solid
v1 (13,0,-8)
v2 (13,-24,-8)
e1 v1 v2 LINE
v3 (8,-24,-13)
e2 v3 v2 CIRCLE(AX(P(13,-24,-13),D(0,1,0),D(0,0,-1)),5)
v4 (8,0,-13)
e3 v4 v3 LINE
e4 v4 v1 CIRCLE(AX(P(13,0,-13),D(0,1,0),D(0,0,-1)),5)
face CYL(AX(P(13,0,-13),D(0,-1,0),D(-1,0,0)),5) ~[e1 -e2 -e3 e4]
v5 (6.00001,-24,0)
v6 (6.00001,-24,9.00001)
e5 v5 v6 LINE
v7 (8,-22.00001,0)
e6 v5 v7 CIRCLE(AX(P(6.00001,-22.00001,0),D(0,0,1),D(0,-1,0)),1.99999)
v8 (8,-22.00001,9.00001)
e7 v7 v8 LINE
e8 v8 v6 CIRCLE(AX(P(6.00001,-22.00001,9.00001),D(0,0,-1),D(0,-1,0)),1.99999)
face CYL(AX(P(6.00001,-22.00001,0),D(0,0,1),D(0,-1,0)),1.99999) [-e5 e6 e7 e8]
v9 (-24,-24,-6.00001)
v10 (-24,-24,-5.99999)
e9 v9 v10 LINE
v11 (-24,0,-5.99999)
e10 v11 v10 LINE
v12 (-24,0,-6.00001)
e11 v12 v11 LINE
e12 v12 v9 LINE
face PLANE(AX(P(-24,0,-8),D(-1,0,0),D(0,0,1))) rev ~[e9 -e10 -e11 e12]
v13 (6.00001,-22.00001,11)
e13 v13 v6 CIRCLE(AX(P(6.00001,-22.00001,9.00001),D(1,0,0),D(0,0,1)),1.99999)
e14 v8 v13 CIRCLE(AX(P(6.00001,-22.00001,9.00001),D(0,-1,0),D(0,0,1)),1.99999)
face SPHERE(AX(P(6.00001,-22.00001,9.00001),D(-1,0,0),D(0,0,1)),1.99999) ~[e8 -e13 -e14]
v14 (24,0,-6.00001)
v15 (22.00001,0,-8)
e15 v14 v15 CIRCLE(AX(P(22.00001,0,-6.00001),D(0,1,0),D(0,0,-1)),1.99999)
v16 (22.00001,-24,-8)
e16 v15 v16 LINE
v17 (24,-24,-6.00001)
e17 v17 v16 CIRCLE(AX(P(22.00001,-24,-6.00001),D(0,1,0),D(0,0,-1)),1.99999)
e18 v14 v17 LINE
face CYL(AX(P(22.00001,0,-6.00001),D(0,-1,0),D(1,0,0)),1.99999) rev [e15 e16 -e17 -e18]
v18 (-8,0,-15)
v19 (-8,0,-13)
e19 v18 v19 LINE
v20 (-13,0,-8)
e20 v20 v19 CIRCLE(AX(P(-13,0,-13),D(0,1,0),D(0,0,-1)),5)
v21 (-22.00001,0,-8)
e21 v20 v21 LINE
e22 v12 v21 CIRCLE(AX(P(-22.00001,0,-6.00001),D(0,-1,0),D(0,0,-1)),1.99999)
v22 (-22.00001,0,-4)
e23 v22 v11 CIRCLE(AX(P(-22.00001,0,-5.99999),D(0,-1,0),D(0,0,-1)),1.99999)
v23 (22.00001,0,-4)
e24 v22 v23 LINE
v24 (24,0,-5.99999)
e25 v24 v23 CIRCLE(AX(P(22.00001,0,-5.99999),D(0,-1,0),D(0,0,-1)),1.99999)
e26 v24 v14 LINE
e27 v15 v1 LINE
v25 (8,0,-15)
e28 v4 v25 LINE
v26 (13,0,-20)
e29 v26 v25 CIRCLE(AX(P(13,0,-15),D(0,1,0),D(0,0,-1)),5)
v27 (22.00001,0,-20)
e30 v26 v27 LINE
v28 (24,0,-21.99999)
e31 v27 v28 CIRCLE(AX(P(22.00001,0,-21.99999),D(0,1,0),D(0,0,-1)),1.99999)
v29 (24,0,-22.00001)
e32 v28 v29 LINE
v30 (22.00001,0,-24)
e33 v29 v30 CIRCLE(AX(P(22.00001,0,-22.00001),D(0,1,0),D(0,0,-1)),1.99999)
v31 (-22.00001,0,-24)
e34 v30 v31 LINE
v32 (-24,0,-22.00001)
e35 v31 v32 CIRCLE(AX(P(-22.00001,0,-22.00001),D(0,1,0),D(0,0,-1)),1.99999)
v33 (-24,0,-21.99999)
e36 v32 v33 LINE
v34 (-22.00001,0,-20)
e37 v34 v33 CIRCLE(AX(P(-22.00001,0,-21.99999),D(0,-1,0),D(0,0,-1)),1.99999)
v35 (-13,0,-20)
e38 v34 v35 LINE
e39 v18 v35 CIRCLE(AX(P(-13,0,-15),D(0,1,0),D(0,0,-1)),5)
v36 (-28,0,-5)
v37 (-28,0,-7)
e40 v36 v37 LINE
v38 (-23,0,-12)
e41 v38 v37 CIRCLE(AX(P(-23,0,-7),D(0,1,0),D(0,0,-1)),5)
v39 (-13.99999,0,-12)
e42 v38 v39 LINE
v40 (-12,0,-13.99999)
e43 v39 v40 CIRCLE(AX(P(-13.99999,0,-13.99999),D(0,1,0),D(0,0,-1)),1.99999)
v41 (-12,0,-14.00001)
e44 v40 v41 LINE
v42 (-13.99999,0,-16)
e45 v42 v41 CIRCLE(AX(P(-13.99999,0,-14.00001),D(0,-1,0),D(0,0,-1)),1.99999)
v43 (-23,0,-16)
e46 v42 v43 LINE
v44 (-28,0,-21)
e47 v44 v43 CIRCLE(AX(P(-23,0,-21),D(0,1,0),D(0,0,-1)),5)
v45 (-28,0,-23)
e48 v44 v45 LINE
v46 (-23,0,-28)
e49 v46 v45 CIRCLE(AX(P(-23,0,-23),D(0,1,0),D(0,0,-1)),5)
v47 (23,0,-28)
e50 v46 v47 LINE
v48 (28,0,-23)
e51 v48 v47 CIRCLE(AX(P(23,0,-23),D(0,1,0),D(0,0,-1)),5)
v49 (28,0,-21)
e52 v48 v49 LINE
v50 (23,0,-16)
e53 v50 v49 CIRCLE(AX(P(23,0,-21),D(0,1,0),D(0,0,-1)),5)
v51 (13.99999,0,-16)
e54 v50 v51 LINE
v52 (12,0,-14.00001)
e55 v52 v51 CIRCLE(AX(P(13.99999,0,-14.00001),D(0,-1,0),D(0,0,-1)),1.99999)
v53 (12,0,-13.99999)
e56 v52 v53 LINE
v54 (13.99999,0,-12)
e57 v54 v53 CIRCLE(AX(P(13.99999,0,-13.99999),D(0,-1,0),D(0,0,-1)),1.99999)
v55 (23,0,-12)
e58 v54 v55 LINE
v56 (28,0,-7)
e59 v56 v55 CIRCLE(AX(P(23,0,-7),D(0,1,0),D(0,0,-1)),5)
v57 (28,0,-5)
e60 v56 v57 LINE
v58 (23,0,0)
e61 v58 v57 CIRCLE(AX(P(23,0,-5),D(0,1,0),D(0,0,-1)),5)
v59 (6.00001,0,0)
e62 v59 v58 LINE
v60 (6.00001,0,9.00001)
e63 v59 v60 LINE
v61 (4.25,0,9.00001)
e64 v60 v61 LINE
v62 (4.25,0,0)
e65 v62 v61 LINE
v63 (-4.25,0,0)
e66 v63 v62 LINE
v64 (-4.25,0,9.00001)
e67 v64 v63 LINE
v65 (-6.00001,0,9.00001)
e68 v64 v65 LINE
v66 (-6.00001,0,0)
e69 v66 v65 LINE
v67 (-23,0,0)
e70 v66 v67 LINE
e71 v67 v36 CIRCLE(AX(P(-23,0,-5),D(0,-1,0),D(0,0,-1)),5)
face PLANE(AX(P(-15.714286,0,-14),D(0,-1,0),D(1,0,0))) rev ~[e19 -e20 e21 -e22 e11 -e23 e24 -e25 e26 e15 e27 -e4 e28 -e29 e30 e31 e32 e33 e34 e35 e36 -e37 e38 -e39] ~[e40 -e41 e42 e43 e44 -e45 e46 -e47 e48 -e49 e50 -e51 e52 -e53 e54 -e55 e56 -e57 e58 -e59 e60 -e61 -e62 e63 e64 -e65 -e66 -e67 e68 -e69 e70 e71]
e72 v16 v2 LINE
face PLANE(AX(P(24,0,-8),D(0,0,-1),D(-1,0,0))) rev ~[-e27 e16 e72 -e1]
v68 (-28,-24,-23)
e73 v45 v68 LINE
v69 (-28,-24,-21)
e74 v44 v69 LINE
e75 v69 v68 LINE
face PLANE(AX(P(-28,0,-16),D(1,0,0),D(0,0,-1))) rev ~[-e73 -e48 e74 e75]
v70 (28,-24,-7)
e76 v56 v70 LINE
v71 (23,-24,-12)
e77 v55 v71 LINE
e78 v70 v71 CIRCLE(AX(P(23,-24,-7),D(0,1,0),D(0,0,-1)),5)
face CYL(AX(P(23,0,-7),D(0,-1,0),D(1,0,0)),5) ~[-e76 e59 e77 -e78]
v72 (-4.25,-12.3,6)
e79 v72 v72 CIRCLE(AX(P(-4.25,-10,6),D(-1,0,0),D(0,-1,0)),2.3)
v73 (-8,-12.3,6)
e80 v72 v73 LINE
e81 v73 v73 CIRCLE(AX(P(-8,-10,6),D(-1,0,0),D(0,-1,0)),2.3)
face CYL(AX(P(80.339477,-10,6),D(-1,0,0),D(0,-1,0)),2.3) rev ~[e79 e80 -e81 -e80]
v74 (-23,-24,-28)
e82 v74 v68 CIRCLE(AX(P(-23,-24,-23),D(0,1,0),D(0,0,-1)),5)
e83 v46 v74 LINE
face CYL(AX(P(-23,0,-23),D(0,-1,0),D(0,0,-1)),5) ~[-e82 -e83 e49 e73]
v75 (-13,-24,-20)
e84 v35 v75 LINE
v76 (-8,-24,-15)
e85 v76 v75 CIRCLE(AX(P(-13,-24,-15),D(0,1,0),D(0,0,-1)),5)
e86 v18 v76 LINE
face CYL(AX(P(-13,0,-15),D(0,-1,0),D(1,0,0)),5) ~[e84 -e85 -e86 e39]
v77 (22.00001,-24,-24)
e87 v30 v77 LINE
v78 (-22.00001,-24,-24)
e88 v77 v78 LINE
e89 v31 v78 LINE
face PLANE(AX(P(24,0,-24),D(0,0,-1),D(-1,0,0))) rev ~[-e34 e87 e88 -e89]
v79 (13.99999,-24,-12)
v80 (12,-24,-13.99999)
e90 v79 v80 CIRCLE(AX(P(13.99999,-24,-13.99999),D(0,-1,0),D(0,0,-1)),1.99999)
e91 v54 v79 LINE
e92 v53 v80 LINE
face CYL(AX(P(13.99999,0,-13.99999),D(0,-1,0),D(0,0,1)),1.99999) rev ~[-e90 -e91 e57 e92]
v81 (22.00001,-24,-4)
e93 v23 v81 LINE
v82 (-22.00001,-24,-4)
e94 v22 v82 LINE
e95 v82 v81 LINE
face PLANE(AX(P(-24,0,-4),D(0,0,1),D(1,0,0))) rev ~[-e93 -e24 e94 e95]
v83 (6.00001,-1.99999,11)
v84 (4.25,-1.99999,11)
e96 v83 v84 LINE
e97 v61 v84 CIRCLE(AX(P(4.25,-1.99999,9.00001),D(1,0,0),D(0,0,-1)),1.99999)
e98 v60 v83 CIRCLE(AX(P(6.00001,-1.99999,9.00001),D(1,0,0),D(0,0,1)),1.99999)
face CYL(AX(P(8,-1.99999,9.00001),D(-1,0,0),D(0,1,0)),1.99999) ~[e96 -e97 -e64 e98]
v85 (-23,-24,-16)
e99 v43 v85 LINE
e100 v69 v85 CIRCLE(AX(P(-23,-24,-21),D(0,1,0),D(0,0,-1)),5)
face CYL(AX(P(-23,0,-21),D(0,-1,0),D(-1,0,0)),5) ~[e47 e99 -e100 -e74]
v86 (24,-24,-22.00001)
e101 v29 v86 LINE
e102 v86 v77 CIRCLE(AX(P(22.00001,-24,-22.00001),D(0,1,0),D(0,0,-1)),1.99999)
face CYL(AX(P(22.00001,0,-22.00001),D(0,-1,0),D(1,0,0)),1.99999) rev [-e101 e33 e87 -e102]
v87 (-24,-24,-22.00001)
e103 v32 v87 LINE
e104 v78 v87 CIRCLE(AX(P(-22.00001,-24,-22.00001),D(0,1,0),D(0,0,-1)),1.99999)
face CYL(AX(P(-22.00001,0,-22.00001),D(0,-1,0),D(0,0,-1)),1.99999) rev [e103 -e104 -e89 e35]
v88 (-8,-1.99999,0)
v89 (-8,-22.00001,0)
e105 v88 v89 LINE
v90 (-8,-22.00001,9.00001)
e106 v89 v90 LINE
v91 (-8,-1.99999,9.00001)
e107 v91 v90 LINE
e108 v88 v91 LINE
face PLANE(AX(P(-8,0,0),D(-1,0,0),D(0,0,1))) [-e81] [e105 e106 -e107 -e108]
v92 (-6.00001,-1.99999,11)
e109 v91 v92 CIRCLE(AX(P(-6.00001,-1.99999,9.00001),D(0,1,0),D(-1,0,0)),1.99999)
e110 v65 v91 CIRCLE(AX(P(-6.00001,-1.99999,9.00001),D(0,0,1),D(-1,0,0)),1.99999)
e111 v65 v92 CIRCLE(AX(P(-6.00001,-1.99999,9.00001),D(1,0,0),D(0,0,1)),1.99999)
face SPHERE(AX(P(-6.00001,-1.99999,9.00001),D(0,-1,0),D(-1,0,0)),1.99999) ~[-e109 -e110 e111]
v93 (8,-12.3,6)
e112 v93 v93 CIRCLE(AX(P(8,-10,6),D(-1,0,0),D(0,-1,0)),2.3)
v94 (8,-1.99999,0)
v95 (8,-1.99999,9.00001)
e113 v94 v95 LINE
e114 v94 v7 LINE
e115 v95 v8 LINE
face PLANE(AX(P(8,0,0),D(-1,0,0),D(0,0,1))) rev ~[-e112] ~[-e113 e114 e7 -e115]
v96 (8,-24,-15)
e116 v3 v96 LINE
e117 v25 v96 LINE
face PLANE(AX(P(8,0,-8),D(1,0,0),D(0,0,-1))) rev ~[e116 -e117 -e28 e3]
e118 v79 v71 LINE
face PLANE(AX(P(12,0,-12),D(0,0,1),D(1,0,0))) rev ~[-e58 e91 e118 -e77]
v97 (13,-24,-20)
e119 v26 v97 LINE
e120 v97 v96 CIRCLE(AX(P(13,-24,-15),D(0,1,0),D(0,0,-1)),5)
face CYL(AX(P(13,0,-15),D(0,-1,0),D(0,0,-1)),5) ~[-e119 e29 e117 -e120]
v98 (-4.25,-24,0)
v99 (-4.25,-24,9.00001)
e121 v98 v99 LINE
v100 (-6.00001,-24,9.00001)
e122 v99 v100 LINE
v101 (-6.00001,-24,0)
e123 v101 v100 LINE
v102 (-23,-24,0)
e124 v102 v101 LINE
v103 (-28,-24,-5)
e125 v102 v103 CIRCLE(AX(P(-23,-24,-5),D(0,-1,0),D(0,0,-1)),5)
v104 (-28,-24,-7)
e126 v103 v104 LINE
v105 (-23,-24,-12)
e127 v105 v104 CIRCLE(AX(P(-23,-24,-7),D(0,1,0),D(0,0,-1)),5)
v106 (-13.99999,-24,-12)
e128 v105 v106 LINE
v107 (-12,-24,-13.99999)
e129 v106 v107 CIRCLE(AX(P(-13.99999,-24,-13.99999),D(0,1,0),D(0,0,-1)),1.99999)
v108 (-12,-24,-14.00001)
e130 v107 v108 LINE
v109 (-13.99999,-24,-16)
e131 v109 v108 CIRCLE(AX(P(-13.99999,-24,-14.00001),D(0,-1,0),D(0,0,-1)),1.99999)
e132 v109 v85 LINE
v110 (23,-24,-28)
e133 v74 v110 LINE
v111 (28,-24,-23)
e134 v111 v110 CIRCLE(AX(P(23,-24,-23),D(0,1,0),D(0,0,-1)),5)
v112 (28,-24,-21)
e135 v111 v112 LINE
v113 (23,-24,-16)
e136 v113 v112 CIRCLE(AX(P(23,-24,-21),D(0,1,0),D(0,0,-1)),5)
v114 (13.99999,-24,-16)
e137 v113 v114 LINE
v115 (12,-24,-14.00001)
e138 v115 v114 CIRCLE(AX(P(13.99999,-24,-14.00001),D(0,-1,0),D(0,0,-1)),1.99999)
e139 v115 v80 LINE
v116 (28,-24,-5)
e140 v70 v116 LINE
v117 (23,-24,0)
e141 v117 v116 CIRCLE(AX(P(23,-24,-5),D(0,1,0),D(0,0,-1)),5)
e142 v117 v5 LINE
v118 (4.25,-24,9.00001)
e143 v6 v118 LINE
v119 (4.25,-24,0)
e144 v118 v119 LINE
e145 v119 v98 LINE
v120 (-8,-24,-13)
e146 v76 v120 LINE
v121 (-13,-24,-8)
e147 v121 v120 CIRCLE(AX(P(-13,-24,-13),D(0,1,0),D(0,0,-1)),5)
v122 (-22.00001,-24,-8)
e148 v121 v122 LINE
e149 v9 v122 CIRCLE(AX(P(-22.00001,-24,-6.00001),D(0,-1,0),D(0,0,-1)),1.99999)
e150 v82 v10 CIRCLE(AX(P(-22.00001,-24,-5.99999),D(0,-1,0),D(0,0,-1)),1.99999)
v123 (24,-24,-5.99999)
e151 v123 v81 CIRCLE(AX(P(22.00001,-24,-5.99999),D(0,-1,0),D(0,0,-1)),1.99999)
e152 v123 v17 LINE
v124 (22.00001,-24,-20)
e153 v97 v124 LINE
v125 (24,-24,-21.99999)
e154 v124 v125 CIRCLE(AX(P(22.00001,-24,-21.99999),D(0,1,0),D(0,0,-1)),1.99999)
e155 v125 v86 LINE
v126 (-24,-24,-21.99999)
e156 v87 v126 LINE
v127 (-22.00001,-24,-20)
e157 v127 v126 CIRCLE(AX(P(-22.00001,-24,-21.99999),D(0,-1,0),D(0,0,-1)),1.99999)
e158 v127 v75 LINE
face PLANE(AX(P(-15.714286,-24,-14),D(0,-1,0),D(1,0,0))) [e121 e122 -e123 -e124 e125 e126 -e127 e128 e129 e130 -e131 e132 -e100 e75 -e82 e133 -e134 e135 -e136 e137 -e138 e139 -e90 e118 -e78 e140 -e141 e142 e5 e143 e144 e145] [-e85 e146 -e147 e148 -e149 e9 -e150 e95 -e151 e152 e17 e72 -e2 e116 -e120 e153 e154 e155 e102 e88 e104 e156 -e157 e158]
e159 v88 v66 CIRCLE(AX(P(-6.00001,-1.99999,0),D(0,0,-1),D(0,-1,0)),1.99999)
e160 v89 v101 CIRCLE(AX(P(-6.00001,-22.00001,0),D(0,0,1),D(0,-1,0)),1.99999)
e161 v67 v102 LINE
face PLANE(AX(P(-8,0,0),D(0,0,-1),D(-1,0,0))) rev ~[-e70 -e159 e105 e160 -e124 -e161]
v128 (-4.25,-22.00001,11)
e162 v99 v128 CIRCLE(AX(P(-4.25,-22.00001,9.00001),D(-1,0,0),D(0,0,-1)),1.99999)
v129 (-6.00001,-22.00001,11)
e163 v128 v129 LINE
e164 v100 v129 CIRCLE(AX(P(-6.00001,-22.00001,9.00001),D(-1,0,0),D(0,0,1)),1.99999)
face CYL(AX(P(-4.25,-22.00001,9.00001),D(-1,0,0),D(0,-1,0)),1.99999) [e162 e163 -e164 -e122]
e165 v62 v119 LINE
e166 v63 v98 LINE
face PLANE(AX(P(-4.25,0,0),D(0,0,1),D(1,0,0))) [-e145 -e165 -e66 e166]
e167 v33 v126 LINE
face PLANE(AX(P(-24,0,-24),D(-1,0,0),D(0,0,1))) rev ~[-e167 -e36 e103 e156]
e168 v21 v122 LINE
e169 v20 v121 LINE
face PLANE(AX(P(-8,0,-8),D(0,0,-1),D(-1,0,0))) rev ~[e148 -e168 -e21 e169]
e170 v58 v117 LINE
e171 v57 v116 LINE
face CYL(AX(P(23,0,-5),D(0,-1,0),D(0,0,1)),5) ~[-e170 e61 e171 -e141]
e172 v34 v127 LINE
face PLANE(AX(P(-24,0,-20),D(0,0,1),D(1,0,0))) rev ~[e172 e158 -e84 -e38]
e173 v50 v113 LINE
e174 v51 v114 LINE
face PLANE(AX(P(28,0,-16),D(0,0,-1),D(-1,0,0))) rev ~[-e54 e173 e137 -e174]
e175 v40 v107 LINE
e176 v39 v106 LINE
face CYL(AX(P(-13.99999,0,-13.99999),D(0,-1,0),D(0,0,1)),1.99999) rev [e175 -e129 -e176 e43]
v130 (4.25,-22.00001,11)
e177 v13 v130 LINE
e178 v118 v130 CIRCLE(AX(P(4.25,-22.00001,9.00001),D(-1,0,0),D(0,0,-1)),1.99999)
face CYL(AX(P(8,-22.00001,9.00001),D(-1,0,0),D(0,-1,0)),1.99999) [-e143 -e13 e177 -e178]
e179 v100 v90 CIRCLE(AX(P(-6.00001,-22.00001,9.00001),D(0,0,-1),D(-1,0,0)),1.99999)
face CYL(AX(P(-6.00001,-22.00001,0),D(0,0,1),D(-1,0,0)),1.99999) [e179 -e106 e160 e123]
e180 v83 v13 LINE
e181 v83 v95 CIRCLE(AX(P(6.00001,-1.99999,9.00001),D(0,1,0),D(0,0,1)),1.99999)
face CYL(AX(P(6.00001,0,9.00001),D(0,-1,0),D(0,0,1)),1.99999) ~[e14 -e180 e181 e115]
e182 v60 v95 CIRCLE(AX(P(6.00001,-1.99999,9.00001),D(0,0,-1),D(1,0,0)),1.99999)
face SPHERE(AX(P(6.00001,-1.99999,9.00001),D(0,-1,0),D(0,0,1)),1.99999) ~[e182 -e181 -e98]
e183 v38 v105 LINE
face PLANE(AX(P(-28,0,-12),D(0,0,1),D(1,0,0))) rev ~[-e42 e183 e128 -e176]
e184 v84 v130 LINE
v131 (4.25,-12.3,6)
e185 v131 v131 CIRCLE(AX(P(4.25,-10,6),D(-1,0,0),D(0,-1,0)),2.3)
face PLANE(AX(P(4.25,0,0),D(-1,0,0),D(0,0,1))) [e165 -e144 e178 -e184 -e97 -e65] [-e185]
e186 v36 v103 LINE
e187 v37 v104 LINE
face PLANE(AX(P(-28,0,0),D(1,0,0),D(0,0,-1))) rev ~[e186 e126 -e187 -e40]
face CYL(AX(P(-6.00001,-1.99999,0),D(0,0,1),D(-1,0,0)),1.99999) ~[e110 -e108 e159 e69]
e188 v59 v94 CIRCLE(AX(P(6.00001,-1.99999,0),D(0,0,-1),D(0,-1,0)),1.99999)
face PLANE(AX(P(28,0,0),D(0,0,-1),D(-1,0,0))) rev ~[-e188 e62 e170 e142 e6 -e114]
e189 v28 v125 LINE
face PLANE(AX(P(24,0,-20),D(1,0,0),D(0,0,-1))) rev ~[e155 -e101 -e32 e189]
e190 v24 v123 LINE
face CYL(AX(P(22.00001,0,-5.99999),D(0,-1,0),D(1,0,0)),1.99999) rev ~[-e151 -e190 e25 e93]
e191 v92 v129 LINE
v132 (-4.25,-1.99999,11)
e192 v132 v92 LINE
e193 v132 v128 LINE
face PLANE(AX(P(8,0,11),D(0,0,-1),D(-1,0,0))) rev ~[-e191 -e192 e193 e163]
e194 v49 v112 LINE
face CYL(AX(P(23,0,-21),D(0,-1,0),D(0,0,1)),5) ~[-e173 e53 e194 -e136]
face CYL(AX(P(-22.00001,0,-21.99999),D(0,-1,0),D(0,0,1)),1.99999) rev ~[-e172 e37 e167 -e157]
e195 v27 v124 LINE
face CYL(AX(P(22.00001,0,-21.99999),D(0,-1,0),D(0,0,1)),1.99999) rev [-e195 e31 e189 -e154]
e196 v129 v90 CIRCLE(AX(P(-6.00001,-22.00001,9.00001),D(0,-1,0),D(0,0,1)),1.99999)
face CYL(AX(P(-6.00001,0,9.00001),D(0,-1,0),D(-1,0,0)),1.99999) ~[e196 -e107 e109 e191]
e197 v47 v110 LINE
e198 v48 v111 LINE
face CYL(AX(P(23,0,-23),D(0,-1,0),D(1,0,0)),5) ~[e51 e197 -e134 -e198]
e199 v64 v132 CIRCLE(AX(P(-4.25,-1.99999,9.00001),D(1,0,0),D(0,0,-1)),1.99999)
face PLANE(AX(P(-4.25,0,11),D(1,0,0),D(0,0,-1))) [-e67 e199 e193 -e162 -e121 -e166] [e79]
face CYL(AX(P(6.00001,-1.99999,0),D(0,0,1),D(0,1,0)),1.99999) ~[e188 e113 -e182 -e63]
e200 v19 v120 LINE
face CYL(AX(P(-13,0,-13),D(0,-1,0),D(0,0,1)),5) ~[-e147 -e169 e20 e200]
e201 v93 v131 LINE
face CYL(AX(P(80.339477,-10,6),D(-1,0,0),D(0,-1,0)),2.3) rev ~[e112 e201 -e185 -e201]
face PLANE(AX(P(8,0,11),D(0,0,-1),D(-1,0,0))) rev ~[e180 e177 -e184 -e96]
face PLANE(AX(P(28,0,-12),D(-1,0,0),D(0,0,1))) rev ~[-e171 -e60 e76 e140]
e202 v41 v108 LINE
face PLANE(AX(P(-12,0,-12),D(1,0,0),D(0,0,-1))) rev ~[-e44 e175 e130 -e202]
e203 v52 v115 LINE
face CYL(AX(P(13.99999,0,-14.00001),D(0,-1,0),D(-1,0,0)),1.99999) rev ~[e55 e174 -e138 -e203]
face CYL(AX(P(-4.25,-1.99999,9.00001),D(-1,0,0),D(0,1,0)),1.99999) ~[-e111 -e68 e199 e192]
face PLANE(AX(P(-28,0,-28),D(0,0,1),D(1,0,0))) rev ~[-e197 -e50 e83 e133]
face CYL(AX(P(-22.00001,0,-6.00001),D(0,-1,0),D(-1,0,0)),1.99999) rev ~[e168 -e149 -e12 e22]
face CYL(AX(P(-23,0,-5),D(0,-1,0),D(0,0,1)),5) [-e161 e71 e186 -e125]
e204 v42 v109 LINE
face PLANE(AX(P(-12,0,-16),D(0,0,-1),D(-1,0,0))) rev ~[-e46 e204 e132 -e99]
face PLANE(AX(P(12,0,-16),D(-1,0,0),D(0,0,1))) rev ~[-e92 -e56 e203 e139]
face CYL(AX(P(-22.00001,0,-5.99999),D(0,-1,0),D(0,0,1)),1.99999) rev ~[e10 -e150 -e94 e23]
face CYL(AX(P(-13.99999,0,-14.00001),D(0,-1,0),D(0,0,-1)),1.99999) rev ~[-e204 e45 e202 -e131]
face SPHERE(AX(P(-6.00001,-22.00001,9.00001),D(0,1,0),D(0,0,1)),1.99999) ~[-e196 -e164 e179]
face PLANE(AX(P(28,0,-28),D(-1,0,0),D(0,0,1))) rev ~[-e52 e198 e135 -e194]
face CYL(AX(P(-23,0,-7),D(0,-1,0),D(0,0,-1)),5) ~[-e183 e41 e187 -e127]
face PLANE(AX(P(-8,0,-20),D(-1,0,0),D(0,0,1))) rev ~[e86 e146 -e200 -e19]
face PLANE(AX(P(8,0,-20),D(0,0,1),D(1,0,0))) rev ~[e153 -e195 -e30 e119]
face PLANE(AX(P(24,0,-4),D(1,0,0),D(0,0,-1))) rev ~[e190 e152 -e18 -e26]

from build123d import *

# Parameters (mm, degrees)
F0_W     = 3.75
F0_H     = 11
F1_DEPTH = 24
F3_DEPTH = 24.001
F4_D     = 4.6
F5_R     = 1.99999
F6_R     = 5


# Not quite as in the source:
# - a fillet or chamfer is up to 0.001 mm smaller than in the source, because OpenCascade refuses the exact size


with BuildPart() as f1:
    # F0 (on Front) → F1 (new body)
    with BuildSketch(Plane.XZ):
        Polygon((0, 0), (-4.25, 0), (-8, 0), (-28, 0), (-28, -12), (-12, -12), (-12, -16), (-28, -16), (-28, -28), (0, -28), (0, -24), (-8, -24), (-24, -24), (-24, -20), (-8, -20), (-8, -11), (-8, -8), (-24, -8), (-24, -4), (-8, -4), (0, -4), align=None)
        Polygon((28, 0), (8, 0), (8, -4), (24, -4), (24, -8), (8, -8), (8, -11), (8, -20), (24, -20), (24, -24), (8, -24), (0, -24), (0, -28), (28, -28), (28, -16), (12, -16), (12, -12), (28, -12), align=None)
        Polygon((8, -4), (8, 0), (4.25, 0), (0, 0), (0, -4), align=None)
        with Locations((6.125, 5.5)):
            Rectangle(F0_W, F0_H)
        Polygon((4.25, 0), (4.25, 11), (-4.25, 11), (-4.25, 0), (0, 0), align=None)
        with Locations((-6.125, 5.5)):
            Rectangle(F0_W, F0_H)
    extrude(amount=F1_DEPTH)

    # F0 (on Front) → F3 (cut, through all)
    with BuildSketch(Plane.XZ):
        Polygon((4.25, 0), (4.25, 11), (-4.25, 11), (-4.25, 0), (0, 0), align=None)
    extrude(amount=F3_DEPTH, mode=Mode.SUBTRACT)

    # F4 (through all)
    with Locations(Plane.YZ.offset(8)):
        with Locations((-10, 6)):
            Hole(F4_D / 2)

    # F5 (radius 2 in the source; OpenCascade refuses exactly that, so slightly less here)
    f5_edges = [f1.edges().sort_by_distance(p)[0] for p in [
        (12, -12, -16),
        (-24, -12, -24),
        (-24, -12, -8),
        (12, -12, -12),
        (24, -12, -8),
        (24, -12, -24),
        (-12, -12, -12),
        (24, -12, -20),
        (24, -12, -4),
        (-24, -12, -20),
        (-24, -12, -4),
        (-12, -12, -16),
        (-8, -12, 11),
        (-6.125, -24, 11),
        (6.125, -24, 11),
        (8, -12, 11),
        (-8, 0, 5.5),
        (-8, -24, 5.5),
        (-6.125, 0, 11),
        (6.125, 0, 11),
        (8, 0, 5.5),
        (8, -24, 5.5),
    ]]
    fillet(f5_edges, radius=F5_R)

    # F6
    f6_edges = [f1.edges().sort_by_distance(p)[0] for p in [
        (-28, -12, -28),
        (-28, -12, -16),
        (-28, -12, -12),
        (-28, -12, 0),
        (8, -12, -8),
        (8, -12, -20),
        (-8, -12, -8),
        (-8, -12, -20),
        (28, -12, 0),
        (28, -12, -12),
        (28, -12, -16),
        (28, -12, -28),
    ]]
    fillet(f6_edges, radius=F6_R)


solid = f1.part
